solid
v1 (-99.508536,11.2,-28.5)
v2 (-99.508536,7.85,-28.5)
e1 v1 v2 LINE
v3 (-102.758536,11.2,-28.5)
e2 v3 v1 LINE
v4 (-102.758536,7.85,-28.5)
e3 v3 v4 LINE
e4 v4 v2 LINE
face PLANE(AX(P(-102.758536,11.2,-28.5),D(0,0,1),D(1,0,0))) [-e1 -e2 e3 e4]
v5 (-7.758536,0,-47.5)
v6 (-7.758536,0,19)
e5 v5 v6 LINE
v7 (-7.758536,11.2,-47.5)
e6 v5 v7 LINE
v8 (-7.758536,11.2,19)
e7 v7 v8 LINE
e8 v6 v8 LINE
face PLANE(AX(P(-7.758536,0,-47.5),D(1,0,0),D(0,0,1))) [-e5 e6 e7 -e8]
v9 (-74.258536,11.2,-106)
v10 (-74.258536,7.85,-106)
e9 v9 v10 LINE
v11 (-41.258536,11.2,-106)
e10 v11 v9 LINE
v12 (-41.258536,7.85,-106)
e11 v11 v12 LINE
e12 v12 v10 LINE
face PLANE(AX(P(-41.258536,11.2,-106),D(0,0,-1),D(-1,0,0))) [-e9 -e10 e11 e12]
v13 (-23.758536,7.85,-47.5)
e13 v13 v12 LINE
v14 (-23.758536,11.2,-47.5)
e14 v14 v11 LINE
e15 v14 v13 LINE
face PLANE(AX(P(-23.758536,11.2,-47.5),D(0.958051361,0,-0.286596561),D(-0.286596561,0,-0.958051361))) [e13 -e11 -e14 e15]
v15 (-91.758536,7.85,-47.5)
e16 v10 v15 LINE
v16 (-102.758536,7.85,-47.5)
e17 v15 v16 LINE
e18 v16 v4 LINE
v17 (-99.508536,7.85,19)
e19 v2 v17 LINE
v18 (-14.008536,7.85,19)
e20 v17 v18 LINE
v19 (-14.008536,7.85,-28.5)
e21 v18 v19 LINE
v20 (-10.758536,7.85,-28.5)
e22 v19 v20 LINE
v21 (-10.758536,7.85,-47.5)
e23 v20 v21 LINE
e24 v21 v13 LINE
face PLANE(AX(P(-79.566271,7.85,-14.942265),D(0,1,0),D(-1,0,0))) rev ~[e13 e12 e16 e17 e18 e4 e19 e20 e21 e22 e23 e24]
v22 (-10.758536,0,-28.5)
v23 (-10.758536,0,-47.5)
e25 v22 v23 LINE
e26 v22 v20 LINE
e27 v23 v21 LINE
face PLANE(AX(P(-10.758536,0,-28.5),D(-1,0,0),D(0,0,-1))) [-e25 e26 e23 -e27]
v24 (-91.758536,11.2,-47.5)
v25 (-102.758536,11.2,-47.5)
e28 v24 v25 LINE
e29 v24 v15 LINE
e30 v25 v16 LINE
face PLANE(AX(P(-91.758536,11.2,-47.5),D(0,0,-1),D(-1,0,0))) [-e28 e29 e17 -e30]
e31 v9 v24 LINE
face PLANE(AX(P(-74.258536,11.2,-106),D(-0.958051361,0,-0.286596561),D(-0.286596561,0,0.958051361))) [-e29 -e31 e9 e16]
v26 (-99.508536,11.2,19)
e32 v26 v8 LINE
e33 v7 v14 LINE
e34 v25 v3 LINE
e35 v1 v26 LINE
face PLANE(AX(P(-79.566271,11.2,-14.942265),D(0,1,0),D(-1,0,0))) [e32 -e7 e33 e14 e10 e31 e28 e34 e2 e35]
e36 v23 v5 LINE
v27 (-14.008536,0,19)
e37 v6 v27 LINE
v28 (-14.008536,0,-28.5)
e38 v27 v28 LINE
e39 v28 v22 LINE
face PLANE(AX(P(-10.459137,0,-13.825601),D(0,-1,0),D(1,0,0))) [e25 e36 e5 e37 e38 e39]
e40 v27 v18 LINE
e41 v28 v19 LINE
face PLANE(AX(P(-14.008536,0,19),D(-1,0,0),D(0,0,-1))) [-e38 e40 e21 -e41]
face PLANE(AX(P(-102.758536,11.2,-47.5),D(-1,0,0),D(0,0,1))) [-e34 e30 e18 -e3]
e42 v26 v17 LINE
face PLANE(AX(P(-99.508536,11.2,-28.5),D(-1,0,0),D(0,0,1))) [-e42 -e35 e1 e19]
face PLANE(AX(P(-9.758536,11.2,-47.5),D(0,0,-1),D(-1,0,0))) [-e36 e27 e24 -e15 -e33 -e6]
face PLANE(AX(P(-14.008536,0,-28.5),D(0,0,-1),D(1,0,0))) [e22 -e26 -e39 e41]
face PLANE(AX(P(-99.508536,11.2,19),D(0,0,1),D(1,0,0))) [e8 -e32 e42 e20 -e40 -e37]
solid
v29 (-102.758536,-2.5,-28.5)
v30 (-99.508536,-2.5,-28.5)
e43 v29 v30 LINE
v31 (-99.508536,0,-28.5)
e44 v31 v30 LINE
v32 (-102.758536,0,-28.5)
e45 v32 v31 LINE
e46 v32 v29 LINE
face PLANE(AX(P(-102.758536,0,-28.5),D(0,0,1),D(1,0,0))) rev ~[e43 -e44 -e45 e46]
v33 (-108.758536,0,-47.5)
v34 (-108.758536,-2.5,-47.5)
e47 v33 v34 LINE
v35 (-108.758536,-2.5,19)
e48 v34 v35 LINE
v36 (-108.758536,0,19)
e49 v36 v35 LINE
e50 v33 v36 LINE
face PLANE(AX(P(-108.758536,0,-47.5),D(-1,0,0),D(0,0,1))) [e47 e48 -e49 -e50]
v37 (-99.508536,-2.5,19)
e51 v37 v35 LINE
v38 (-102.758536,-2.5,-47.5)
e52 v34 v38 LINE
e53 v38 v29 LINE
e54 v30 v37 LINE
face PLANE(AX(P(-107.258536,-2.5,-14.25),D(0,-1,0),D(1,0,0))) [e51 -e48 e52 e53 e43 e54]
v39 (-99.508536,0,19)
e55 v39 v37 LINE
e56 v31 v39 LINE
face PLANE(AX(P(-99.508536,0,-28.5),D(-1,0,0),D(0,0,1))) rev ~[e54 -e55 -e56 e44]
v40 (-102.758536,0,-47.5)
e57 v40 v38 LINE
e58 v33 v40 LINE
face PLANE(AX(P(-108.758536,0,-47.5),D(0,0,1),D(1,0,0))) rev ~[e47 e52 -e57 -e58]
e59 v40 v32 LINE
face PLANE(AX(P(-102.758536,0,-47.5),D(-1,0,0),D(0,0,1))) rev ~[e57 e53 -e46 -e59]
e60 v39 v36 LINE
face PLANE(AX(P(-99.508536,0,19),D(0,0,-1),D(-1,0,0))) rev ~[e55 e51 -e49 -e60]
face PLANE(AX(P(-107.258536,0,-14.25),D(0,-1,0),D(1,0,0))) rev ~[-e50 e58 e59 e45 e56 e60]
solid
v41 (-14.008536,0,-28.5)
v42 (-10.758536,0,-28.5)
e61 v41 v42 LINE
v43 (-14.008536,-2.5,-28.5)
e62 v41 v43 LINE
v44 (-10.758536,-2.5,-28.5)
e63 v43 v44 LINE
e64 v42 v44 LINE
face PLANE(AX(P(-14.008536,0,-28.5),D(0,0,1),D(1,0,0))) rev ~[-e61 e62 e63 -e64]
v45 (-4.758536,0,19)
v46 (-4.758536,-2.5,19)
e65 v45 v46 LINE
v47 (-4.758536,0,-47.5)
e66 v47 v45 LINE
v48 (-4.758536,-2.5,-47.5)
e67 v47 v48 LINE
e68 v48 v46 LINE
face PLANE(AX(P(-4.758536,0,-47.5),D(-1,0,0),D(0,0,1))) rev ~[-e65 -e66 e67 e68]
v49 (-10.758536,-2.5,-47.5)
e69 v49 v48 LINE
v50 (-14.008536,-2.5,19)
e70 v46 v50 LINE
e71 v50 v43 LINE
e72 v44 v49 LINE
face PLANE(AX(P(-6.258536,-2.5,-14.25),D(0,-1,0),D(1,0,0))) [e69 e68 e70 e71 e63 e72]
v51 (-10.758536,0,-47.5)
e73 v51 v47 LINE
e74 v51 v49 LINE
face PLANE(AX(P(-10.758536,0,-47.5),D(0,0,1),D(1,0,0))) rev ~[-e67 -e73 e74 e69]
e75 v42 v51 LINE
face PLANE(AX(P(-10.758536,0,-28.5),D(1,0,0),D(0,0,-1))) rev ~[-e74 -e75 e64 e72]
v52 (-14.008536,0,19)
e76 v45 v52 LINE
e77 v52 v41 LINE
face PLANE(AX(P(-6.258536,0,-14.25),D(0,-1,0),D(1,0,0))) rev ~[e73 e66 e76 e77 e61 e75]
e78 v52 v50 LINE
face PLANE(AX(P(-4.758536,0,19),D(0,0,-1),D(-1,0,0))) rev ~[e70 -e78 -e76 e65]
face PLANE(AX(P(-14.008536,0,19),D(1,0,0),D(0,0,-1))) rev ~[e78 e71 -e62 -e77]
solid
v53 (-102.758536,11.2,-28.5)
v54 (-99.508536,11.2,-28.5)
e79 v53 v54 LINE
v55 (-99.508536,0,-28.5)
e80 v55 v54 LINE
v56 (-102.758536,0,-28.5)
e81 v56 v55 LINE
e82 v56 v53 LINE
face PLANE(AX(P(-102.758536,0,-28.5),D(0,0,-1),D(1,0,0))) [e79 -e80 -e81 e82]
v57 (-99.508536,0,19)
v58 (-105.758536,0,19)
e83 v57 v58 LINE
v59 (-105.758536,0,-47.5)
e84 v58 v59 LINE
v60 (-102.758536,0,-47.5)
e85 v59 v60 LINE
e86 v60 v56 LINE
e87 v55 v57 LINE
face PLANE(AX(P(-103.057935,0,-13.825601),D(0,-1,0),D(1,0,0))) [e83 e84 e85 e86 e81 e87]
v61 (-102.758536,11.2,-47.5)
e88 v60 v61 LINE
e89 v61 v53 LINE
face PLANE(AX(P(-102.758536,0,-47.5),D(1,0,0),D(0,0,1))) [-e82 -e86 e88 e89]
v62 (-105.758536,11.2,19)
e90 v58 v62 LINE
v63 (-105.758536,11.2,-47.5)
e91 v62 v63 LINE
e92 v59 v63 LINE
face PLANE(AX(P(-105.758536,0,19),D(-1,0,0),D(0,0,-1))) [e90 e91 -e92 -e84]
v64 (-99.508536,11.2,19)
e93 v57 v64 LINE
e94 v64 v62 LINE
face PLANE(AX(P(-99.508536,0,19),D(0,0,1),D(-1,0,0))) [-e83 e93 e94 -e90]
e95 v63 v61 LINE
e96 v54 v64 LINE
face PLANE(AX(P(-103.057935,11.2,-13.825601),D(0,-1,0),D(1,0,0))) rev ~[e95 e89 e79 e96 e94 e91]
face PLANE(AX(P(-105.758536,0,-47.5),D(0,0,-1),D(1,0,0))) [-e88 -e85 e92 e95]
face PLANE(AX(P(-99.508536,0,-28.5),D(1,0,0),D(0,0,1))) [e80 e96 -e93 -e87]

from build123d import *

# Parameters (mm, degrees)
F0_W     = 3
F0_H     = 66.5
F1_DEPTH = 2.5
F2_DEPTH = 11.2
F4_DEPTH = 3.35


with BuildPart() as f1:
    # F0 (on Front) → F1 (new body)
    with BuildSketch(Plane.XZ):
        with Locations((-107.2585358843, -14.25)):
            Rectangle(F0_W, F0_H)
        Polygon((-99.5085358843, 19), (-105.7585358843, 19), (-105.7585358843, -47.5), (-102.7585358843, -47.5), (-102.7585358843, -28.5), (-99.5085358843, -28.5), align=None)
    extrude(amount=F1_DEPTH)


with BuildPart() as f1b:
    # F0 (on Front) → F1, piece 2 (new body)
    with BuildSketch(Plane.XZ):
        with Locations((-6.2585358843, -14.25)):
            Rectangle(F0_W, F0_H)
        Polygon((-13.5085358843, 19), (-14.0085358843, 19), (-14.0085358843, -28.5), (-10.7585358843, -28.5), (-10.7585358843, -47.5), (-7.7585358843, -47.5), (-7.7585358843, 19), align=None)
    extrude(amount=F1_DEPTH)


with BuildPart() as f2:
    # F0 (on Front) → F2 (new body)
    with BuildSketch(Plane.XZ):
        Polygon((-99.5085358843, 19), (-105.7585358843, 19), (-105.7585358843, -47.5), (-102.7585358843, -47.5), (-102.7585358843, -28.5), (-99.5085358843, -28.5), align=None)
    extrude(amount=-F2_DEPTH)


with BuildPart() as f2b:
    # F0 (on Front) → F2, piece 2 (new body)
    with BuildSketch(Plane.XZ):
        Polygon((-13.5085358843, 19), (-14.0085358843, 19), (-14.0085358843, -28.5), (-10.7585358843, -28.5), (-10.7585358843, -47.5), (-7.7585358843, -47.5), (-7.7585358843, 19), align=None)
    extrude(amount=-F2_DEPTH)

    # F3 (on face) → F4 (join)
    with BuildSketch(Plane(origin=(0, 11.2, 0), x_dir=(-1, 0, 0), z_dir=(0, 1, 0))):
        Polygon((91.7585358843, -47.5), (102.7585358843, -47.5), (102.7585358843, -28.5), (99.5085358843, -28.5), (99.5085358843, 19), (57.7585358843, 19), (57.7585358843, -47.5), align=None)
        Polygon((74.2585358843, -106), (91.7585358843, -47.5), (57.7585358843, -47.5), (57.7585358843, -106), align=None)
        Polygon((57.7585358843, -106), (57.7585358843, -47.5), (23.7585358843, -47.5), (41.2585358843, -106), align=None)
        Polygon((23.7585358843, -47.5), (57.7585358843, -47.5), (57.7585358843, 19), (9.7585358843, 19), (9.7585358843, -47.5), align=None)
    extrude(amount=-F4_DEPTH)


solid = Compound([f1.part, f1b.part, f2.part, f2b.part])
